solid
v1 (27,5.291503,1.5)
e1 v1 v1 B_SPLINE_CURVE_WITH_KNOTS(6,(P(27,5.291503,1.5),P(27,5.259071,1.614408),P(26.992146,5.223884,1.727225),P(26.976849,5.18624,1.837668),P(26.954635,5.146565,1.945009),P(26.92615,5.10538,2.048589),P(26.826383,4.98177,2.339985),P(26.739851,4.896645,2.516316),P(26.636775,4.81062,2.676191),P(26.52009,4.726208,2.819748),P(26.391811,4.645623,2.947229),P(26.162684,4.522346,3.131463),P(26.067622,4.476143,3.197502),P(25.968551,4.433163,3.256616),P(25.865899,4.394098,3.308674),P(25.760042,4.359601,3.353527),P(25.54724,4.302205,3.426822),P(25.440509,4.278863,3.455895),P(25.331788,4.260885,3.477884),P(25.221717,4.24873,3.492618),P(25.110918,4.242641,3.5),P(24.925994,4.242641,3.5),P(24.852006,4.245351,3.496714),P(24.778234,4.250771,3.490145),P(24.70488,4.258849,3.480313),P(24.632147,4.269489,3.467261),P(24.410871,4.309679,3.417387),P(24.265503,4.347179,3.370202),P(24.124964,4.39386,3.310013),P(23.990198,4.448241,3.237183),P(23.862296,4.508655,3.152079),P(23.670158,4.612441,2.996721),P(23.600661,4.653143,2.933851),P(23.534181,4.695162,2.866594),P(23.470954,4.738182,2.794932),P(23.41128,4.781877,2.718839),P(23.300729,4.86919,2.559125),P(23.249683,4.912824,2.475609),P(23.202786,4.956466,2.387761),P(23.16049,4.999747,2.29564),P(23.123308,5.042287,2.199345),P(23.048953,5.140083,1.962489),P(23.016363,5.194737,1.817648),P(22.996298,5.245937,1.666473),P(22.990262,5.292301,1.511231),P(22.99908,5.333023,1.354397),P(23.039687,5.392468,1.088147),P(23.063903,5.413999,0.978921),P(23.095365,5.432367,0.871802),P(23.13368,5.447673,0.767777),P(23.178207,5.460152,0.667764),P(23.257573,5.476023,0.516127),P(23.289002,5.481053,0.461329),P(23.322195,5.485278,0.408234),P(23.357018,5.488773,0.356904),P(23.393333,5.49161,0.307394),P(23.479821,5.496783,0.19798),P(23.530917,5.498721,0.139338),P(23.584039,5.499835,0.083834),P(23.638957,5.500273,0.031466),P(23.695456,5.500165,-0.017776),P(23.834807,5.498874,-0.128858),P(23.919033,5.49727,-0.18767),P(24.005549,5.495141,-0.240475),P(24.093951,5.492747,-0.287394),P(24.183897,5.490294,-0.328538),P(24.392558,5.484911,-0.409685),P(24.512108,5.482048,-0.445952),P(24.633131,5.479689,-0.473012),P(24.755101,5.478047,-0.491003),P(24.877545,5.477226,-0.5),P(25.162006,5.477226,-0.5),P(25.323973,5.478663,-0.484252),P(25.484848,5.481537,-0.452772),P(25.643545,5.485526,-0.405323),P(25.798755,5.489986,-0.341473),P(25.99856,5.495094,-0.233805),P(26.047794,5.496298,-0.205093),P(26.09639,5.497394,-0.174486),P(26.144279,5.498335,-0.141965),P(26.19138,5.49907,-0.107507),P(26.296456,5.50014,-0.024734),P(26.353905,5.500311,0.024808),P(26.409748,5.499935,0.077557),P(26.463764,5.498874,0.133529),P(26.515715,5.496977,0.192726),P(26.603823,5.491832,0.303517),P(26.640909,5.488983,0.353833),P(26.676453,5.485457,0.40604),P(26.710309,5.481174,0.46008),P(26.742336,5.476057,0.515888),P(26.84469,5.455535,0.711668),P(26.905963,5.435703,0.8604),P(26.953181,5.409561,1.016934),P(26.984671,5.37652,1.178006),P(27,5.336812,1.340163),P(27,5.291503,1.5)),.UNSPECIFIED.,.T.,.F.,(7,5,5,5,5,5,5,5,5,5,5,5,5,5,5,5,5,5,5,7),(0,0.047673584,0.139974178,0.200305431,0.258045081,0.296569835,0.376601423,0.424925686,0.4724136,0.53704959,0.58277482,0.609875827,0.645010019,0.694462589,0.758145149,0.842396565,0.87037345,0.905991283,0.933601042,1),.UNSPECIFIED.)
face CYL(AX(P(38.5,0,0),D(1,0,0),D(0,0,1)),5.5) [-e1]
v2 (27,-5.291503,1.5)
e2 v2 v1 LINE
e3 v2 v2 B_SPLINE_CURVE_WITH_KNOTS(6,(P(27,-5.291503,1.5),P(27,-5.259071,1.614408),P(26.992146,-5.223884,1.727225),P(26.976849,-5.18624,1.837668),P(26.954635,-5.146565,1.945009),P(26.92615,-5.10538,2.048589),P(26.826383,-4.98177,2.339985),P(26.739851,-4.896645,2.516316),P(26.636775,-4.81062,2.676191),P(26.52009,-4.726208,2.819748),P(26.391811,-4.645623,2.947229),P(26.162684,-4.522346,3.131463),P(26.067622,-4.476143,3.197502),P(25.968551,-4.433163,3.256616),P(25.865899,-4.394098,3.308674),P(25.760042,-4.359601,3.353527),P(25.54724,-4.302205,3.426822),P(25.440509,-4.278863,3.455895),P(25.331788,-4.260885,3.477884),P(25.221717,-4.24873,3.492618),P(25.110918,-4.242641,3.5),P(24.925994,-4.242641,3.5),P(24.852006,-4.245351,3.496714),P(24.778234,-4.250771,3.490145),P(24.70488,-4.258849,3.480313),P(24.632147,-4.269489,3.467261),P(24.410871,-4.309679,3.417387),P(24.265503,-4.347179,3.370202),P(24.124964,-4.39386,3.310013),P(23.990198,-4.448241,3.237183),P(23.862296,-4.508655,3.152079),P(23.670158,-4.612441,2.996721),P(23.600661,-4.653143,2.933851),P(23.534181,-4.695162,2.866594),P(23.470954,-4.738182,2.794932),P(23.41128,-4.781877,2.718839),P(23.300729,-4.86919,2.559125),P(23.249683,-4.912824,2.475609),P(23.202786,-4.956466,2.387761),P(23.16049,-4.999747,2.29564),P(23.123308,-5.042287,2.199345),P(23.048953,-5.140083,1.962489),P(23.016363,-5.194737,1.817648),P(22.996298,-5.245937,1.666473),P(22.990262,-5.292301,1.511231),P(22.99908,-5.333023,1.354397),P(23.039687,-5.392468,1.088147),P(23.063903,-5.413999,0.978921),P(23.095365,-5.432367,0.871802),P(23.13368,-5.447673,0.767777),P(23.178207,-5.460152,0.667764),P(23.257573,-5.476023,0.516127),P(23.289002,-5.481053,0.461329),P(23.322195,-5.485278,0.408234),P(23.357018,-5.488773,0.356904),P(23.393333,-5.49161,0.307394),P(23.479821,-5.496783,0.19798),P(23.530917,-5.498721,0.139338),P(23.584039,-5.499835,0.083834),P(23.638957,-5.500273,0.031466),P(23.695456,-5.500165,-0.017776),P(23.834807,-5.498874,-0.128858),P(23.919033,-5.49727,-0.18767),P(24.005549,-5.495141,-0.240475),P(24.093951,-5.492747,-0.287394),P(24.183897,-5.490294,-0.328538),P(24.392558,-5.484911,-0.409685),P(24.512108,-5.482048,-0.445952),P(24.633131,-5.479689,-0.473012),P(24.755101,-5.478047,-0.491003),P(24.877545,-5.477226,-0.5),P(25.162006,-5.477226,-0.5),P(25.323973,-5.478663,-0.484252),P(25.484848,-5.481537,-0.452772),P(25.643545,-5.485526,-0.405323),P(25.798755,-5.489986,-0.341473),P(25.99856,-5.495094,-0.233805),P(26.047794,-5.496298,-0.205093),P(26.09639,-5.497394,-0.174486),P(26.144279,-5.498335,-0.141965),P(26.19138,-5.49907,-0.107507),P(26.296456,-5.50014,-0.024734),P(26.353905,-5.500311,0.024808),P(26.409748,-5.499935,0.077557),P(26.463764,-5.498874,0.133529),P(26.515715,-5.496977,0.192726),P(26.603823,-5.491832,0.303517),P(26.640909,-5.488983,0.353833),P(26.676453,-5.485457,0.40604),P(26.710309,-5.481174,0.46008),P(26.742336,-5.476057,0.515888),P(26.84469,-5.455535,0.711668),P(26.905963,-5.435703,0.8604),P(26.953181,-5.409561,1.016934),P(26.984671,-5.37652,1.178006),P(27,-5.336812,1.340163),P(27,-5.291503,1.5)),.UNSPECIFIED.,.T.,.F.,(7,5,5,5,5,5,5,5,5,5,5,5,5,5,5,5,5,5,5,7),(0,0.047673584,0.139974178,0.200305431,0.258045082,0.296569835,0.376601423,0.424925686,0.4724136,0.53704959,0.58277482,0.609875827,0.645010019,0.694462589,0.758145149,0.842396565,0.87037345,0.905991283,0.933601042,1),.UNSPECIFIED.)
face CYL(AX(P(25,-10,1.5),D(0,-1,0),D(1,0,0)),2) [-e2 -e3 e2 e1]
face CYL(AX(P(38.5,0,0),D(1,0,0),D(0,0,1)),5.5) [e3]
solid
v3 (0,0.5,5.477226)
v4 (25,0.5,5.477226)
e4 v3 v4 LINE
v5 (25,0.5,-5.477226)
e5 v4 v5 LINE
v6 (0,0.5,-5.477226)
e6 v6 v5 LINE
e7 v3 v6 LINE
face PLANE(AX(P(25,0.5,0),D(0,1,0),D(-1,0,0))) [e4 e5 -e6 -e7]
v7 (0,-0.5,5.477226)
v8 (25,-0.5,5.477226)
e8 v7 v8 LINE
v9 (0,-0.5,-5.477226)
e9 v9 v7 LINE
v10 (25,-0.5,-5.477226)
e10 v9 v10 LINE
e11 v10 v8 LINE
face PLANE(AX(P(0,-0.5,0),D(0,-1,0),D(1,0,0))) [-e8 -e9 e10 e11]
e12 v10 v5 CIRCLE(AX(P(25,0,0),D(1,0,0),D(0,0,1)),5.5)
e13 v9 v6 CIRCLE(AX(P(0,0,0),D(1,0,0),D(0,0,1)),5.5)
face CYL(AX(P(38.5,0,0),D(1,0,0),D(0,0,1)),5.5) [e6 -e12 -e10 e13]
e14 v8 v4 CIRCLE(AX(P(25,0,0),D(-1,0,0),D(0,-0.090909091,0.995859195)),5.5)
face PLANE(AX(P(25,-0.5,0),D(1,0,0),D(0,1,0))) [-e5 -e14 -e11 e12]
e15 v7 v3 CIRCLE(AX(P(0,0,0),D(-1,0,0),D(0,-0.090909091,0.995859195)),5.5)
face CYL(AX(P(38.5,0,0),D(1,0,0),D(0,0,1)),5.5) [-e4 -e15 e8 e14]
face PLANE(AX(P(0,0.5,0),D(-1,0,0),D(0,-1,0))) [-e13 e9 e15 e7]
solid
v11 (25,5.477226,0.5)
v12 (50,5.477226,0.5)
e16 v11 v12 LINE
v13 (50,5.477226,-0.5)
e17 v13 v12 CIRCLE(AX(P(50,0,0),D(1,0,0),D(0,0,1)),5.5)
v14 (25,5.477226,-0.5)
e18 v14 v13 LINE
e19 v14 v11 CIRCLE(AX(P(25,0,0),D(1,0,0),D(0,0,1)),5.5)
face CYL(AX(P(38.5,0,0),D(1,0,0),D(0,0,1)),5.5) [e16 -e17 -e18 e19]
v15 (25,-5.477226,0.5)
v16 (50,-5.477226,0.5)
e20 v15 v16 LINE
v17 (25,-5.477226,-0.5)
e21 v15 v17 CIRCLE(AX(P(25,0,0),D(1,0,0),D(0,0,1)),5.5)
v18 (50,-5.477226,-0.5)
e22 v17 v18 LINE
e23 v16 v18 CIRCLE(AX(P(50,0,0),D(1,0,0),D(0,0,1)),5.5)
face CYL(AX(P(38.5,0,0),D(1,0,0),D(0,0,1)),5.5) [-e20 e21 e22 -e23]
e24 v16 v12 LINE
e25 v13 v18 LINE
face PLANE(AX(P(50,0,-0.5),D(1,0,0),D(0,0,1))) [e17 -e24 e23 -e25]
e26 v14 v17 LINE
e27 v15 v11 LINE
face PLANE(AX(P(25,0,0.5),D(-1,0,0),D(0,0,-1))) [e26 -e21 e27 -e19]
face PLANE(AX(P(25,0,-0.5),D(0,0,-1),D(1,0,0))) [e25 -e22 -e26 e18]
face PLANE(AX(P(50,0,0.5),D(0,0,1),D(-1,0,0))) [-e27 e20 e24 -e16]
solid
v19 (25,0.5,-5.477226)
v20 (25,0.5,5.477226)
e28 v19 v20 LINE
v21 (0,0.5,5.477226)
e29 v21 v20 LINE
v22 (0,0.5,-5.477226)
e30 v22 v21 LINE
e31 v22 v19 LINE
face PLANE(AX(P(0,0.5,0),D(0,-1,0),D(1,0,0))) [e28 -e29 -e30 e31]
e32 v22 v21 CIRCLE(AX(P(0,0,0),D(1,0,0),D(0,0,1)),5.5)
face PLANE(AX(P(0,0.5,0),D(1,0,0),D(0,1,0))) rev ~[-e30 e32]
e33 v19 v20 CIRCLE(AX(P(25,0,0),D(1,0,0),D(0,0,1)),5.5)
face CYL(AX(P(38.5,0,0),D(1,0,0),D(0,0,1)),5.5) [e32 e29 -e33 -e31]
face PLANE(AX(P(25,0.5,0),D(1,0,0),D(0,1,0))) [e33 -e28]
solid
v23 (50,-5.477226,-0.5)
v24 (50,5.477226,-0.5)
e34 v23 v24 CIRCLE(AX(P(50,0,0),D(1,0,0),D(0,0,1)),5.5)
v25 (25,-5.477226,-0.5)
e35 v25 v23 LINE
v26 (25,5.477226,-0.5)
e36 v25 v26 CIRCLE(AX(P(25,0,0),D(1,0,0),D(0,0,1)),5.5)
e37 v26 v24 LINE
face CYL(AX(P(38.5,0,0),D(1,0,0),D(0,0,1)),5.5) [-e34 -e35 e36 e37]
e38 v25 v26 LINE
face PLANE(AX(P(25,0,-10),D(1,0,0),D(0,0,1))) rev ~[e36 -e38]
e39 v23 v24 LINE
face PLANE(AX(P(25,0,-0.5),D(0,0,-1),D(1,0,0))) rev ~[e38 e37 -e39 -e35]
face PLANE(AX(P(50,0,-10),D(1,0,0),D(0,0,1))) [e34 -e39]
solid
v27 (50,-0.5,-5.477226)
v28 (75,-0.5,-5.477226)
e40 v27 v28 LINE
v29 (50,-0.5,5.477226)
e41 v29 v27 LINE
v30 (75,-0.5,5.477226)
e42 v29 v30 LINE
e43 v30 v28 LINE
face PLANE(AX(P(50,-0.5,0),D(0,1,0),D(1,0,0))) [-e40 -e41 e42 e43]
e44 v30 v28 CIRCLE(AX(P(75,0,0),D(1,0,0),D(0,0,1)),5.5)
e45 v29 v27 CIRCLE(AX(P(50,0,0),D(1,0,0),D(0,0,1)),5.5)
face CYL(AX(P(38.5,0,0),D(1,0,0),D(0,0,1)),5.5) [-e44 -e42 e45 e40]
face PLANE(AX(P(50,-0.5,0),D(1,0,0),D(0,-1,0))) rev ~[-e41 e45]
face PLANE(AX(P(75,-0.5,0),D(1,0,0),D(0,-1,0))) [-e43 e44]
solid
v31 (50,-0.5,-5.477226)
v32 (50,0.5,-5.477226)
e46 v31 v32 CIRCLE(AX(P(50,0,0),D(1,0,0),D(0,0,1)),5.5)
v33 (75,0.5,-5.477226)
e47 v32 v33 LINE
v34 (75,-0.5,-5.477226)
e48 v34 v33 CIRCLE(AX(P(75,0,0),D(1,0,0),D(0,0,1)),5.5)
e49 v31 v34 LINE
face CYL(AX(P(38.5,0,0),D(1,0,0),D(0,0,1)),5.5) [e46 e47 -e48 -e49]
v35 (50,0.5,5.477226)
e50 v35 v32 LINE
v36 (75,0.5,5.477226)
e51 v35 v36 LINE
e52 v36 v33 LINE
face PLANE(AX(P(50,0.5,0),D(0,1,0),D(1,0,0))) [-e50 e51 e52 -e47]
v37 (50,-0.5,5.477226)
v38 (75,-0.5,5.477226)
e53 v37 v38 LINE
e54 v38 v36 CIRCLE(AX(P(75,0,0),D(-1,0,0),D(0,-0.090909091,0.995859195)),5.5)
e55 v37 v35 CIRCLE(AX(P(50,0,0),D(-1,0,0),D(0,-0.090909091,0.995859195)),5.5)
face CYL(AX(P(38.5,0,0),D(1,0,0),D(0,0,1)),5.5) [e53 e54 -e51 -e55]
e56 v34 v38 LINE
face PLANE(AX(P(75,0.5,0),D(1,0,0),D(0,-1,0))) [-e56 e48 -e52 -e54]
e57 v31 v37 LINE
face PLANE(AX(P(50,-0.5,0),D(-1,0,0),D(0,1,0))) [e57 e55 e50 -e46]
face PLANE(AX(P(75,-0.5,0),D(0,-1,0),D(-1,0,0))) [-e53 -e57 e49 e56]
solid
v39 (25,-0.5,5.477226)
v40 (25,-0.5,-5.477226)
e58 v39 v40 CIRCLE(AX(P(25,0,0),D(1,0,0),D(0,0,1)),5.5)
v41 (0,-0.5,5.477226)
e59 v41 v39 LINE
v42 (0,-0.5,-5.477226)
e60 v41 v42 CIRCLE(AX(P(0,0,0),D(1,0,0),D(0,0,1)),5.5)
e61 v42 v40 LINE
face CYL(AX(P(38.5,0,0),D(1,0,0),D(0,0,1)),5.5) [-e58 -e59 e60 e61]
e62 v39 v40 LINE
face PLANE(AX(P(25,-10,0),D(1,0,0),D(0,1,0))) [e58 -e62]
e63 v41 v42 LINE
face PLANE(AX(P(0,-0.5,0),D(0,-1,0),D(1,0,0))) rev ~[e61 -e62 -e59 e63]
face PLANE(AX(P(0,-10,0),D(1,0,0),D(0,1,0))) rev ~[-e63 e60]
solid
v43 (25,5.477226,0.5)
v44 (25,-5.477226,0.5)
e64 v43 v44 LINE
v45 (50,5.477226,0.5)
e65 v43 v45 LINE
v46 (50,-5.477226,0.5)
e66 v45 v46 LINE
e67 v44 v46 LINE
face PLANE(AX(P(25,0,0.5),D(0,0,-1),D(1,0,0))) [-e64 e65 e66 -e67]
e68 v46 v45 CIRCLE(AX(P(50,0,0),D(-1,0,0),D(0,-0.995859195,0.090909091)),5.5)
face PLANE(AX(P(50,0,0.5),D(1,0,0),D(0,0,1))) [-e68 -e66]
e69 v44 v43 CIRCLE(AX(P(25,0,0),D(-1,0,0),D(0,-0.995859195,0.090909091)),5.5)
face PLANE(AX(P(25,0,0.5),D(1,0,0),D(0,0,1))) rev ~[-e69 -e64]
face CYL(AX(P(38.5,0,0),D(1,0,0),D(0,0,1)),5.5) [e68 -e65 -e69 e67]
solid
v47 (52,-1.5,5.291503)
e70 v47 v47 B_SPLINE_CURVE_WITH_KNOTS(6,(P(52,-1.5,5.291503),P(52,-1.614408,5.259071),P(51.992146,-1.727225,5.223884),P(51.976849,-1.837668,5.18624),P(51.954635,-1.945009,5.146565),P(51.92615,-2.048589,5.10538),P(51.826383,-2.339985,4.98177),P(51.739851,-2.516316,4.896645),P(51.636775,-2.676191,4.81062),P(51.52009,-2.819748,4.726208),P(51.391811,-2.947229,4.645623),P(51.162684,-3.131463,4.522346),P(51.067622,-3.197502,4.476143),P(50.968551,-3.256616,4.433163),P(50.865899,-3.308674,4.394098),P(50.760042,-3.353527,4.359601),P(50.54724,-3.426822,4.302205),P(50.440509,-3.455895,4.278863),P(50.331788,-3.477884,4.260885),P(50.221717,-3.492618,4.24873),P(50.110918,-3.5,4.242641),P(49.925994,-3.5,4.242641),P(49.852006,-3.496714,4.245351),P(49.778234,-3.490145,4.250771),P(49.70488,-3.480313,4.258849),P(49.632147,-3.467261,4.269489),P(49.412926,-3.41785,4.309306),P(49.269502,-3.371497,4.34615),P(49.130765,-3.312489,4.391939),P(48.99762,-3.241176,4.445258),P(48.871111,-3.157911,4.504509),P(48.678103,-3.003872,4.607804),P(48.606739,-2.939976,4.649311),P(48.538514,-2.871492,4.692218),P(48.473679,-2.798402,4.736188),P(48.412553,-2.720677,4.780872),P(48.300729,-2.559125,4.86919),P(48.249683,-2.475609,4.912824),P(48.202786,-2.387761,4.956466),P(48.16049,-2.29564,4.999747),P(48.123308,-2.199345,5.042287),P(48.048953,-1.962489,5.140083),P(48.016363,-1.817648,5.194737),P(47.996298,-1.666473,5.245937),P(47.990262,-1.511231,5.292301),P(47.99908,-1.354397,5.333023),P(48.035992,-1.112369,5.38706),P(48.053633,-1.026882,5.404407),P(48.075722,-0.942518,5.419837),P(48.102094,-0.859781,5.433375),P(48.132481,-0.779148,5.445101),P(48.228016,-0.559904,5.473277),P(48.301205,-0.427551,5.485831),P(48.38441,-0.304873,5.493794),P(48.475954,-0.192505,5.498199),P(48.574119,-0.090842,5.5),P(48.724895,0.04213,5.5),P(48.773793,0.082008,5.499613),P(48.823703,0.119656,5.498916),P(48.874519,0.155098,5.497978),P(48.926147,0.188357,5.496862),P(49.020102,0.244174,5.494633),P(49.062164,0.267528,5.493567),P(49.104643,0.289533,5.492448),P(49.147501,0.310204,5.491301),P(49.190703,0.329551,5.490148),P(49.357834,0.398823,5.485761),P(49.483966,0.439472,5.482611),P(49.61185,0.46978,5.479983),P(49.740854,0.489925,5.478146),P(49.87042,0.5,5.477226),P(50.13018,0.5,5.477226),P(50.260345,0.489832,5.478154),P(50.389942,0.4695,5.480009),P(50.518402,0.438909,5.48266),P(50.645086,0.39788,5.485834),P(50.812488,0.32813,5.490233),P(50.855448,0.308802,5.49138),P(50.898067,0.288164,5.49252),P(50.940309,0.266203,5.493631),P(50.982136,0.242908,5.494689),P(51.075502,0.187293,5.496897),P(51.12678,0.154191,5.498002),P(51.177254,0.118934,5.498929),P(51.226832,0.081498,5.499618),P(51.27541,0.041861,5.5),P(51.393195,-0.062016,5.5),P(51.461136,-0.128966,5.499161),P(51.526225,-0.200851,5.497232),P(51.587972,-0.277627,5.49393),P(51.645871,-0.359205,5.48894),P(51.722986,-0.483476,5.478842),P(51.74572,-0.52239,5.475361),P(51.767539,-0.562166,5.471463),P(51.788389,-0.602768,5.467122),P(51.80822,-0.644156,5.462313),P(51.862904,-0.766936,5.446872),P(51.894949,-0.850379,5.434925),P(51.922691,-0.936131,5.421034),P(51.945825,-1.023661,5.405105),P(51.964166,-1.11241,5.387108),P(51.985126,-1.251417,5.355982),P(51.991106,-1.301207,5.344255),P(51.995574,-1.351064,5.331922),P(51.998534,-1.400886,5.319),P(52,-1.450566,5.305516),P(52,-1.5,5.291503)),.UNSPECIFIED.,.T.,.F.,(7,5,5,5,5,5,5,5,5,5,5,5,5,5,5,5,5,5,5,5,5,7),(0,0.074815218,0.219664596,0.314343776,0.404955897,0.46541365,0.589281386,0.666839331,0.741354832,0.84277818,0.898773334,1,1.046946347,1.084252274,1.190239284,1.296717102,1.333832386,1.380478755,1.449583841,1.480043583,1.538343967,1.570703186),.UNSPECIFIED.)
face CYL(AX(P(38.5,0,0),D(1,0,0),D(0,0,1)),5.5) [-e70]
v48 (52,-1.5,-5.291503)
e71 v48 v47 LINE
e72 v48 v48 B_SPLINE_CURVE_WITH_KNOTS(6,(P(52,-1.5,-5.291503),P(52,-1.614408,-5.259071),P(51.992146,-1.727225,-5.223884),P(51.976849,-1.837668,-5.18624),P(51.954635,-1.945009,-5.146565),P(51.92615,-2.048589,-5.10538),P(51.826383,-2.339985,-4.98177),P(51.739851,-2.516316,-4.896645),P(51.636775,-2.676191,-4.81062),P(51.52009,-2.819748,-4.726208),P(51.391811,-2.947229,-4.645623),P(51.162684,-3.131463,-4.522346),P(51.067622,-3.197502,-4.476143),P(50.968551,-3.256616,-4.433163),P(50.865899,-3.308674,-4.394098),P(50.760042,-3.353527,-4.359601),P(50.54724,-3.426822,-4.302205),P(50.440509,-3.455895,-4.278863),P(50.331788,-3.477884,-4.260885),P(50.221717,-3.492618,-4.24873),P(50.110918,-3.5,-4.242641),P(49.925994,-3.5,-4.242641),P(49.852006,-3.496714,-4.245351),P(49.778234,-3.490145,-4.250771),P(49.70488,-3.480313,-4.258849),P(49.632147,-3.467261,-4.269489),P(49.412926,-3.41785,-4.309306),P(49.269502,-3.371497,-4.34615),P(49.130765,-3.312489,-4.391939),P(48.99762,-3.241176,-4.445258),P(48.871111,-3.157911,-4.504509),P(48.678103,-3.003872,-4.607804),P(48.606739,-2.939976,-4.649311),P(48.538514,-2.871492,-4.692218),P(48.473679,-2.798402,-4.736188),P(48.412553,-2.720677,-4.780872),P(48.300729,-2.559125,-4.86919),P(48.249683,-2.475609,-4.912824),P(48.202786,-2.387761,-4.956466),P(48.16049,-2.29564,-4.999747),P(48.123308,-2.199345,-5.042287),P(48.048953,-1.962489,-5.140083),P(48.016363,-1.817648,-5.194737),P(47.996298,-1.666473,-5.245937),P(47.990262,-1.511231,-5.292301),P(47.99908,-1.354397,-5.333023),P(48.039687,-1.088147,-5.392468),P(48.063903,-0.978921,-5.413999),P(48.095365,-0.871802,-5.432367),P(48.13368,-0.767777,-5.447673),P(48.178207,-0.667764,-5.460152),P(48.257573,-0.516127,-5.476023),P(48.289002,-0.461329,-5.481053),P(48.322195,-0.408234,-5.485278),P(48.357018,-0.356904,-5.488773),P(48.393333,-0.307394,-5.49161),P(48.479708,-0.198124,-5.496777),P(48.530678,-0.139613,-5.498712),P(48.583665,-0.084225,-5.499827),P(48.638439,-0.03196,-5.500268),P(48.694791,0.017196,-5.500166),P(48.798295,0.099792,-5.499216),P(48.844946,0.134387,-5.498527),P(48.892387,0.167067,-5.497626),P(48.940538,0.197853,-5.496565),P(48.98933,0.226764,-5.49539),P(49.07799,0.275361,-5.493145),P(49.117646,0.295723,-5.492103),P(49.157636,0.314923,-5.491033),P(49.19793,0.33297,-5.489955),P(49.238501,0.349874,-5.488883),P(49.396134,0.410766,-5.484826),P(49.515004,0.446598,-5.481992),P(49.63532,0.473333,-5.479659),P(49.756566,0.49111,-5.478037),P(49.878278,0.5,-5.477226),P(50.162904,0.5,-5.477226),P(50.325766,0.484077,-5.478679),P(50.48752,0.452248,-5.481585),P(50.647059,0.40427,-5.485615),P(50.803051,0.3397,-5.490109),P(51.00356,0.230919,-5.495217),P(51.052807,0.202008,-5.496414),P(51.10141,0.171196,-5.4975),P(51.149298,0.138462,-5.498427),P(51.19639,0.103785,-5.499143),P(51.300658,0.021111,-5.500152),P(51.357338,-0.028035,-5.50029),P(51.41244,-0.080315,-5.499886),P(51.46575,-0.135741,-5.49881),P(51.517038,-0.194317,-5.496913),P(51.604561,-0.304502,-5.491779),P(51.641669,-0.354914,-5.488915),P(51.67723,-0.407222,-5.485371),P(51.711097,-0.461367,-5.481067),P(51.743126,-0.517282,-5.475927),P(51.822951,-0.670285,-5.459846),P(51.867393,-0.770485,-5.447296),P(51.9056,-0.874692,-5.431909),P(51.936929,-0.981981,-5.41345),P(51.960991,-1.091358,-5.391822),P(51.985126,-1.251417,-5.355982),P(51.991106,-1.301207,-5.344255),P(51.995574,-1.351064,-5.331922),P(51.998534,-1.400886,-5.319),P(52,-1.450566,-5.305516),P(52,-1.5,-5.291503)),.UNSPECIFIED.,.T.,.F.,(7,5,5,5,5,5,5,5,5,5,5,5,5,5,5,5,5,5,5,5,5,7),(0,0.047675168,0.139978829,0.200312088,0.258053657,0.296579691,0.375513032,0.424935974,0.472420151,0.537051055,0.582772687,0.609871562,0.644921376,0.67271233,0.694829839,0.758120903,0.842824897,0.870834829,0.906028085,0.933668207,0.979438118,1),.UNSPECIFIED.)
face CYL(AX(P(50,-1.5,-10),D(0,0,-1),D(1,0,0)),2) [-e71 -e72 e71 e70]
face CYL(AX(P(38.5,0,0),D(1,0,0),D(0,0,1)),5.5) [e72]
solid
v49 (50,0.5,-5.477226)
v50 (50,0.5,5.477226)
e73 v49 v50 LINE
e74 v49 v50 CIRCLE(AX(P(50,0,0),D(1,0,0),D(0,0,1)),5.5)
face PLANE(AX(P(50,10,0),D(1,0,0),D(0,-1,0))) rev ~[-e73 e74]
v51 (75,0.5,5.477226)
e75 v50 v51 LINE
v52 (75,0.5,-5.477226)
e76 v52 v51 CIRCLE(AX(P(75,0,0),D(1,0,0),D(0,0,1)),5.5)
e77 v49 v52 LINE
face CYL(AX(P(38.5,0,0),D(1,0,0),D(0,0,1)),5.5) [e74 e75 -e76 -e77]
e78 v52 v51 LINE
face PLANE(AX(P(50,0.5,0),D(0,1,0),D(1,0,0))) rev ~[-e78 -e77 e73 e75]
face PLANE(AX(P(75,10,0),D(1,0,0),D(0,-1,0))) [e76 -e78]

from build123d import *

# Parameters (mm, degrees)
F0_W     = 25
F0_H     = 9.5
F1_DEPTH = 10
F2_DEPTH = 10
F5_ANGLE = 90
F6_R     = 2
F7_DEPTH = 20
F9_ANGLE = 90
F10_W    = 77
F10_H    = 5.5


with BuildPart() as f1:
    # F0 (on Top) → F1 (new body, symmetric)
    with BuildSketch(Plane.XY):
        with Locations((12.5, -5.25)):
            Rectangle(F0_W, F0_H)
    extrude(amount=F1_DEPTH, both=True)


with BuildPart() as f1b:
    # F0 (on Top) → F1, piece 2 (new body, symmetric)
    with BuildSketch(Plane.XY):
        with Locations((12.5, 5.25)):
            Rectangle(F0_W, F0_H)
    extrude(amount=F1_DEPTH, both=True)


with BuildPart() as f2:
    # F0 (on Top) → F2 (new body, symmetric)
    with BuildSketch(Plane.XY):
        Polygon((0, 0.5), (0, 0), (0, -0.5), (25, -0.5), (25, 0.5), align=None)
    extrude(amount=F2_DEPTH, both=True)


with BuildPart() as f3_1:
    # F3: copy of F1
    add(f1.part.moved(Location((25, 0, 0))))


with BuildPart() as f3_2:
    # F3: copy of F1b
    add(f1b.part.moved(Location((25, 0, 0))))


with BuildPart() as f3_3:
    # F3: copy of F2
    add(f2.part.moved(Location((25, 0, 0))))


with BuildPart() as f3_2_1:
    # F5: moved
    add(f3_2.part.rotate(Axis((36.7808852345, 0, 0), (1, 0, 0)), F5_ANGLE))


with BuildPart() as f3_3_1:
    # F5: moved
    add(f3_3.part.rotate(Axis((36.7808852345, 0, 0), (1, 0, 0)), F5_ANGLE))


with BuildPart() as f3_1_1:
    # F5: moved
    add(f3_1.part.rotate(Axis((36.7808852345, 0, 0), (1, 0, 0)), F5_ANGLE))


with BuildPart() as f7:
    # F6 (on face) → F7 (new body)
    with BuildSketch(Plane.XZ.offset(10)):
        with Locations((25, 1.5)):
            Circle(F6_R)
    extrude(amount=-F7_DEPTH)


with BuildPart() as f8_1:
    # F8: copy of F3_2
    add(f3_2_1.part.moved(Location((25, 0, 0))))


with BuildPart() as f8_2:
    # F8: copy of F3_3
    add(f3_3_1.part.moved(Location((25, 0, 0))))


with BuildPart() as f8_3:
    # F8: copy of F3_1
    add(f3_1_1.part.moved(Location((25, 0, 0))))


with BuildPart() as f8_4:
    # F8: copy of F7
    add(f7.part.moved(Location((25, 0, 0))))


with BuildPart() as f8_4_1:
    # F9: moved
    add(f8_4.part.rotate(Axis((36.7808852345, 0, 0), (1, 0, 0)), F9_ANGLE))


with BuildPart() as f8_1_1:
    # F9: moved
    add(f8_1.part.rotate(Axis((36.7808852345, 0, 0), (1, 0, 0)), F9_ANGLE))


with BuildPart() as f8_2_1:
    # F9: moved
    add(f8_2.part.rotate(Axis((36.7808852345, 0, 0), (1, 0, 0)), F9_ANGLE))


with BuildPart() as f8_3_1:
    # F9: moved
    add(f8_3.part.rotate(Axis((36.7808852345, 0, 0), (1, 0, 0)), F9_ANGLE))


with BuildPart() as f11_tool:
    # F10 (on Front) → F11 (revolve)
    with BuildSketch(Plane.XZ):
        with Locations((38.5, 2.75)):
            Rectangle(F10_W, F10_H)
    revolve(axis=Axis((36.7808852345, 0, 0), (1, 0, 0)))


with BuildPart() as f1_1:
    add(f1.part)

    # F11: intersect by f11_tool
    add(f11_tool.part, mode=Mode.INTERSECT)


with BuildPart() as f1b_1:
    add(f1b.part)

    # F11: intersect by f11_tool
    add(f11_tool.part, mode=Mode.INTERSECT)


with BuildPart() as f2_1:
    add(f2.part)

    # F11: intersect by f11_tool
    add(f11_tool.part, mode=Mode.INTERSECT)


with BuildPart() as f3_1_2:
    add(f3_1_1.part)

    # F11: intersect by f11_tool
    add(f11_tool.part, mode=Mode.INTERSECT)


with BuildPart() as f3_2_2:
    add(f3_2_1.part)

    # F11: intersect by f11_tool
    add(f11_tool.part, mode=Mode.INTERSECT)


with BuildPart() as f3_3_2:
    add(f3_3_1.part)

    # F11: intersect by f11_tool
    add(f11_tool.part, mode=Mode.INTERSECT)


with BuildPart() as f7_1:
    add(f7.part)

    # F11: intersect by f11_tool
    add(f11_tool.part, mode=Mode.INTERSECT)


with BuildPart() as f8_1_2:
    add(f8_1_1.part)

    # F11: intersect by f11_tool
    add(f11_tool.part, mode=Mode.INTERSECT)


with BuildPart() as f8_2_2:
    add(f8_2_1.part)

    # F11: intersect by f11_tool
    add(f11_tool.part, mode=Mode.INTERSECT)


with BuildPart() as f8_3_2:
    add(f8_3_1.part)

    # F11: intersect by f11_tool
    add(f11_tool.part, mode=Mode.INTERSECT)


with BuildPart() as f8_4_2:
    add(f8_4_1.part)

    # F11: intersect by f11_tool
    add(f11_tool.part, mode=Mode.INTERSECT)


solid = Compound([f1_1.part, f1b_1.part, f2_1.part, f3_1_2.part, f3_2_2.part, f3_3_2.part, f7_1.part, f8_1_2.part, f8_2_2.part, f8_3_2.part, f8_4_2.part])
